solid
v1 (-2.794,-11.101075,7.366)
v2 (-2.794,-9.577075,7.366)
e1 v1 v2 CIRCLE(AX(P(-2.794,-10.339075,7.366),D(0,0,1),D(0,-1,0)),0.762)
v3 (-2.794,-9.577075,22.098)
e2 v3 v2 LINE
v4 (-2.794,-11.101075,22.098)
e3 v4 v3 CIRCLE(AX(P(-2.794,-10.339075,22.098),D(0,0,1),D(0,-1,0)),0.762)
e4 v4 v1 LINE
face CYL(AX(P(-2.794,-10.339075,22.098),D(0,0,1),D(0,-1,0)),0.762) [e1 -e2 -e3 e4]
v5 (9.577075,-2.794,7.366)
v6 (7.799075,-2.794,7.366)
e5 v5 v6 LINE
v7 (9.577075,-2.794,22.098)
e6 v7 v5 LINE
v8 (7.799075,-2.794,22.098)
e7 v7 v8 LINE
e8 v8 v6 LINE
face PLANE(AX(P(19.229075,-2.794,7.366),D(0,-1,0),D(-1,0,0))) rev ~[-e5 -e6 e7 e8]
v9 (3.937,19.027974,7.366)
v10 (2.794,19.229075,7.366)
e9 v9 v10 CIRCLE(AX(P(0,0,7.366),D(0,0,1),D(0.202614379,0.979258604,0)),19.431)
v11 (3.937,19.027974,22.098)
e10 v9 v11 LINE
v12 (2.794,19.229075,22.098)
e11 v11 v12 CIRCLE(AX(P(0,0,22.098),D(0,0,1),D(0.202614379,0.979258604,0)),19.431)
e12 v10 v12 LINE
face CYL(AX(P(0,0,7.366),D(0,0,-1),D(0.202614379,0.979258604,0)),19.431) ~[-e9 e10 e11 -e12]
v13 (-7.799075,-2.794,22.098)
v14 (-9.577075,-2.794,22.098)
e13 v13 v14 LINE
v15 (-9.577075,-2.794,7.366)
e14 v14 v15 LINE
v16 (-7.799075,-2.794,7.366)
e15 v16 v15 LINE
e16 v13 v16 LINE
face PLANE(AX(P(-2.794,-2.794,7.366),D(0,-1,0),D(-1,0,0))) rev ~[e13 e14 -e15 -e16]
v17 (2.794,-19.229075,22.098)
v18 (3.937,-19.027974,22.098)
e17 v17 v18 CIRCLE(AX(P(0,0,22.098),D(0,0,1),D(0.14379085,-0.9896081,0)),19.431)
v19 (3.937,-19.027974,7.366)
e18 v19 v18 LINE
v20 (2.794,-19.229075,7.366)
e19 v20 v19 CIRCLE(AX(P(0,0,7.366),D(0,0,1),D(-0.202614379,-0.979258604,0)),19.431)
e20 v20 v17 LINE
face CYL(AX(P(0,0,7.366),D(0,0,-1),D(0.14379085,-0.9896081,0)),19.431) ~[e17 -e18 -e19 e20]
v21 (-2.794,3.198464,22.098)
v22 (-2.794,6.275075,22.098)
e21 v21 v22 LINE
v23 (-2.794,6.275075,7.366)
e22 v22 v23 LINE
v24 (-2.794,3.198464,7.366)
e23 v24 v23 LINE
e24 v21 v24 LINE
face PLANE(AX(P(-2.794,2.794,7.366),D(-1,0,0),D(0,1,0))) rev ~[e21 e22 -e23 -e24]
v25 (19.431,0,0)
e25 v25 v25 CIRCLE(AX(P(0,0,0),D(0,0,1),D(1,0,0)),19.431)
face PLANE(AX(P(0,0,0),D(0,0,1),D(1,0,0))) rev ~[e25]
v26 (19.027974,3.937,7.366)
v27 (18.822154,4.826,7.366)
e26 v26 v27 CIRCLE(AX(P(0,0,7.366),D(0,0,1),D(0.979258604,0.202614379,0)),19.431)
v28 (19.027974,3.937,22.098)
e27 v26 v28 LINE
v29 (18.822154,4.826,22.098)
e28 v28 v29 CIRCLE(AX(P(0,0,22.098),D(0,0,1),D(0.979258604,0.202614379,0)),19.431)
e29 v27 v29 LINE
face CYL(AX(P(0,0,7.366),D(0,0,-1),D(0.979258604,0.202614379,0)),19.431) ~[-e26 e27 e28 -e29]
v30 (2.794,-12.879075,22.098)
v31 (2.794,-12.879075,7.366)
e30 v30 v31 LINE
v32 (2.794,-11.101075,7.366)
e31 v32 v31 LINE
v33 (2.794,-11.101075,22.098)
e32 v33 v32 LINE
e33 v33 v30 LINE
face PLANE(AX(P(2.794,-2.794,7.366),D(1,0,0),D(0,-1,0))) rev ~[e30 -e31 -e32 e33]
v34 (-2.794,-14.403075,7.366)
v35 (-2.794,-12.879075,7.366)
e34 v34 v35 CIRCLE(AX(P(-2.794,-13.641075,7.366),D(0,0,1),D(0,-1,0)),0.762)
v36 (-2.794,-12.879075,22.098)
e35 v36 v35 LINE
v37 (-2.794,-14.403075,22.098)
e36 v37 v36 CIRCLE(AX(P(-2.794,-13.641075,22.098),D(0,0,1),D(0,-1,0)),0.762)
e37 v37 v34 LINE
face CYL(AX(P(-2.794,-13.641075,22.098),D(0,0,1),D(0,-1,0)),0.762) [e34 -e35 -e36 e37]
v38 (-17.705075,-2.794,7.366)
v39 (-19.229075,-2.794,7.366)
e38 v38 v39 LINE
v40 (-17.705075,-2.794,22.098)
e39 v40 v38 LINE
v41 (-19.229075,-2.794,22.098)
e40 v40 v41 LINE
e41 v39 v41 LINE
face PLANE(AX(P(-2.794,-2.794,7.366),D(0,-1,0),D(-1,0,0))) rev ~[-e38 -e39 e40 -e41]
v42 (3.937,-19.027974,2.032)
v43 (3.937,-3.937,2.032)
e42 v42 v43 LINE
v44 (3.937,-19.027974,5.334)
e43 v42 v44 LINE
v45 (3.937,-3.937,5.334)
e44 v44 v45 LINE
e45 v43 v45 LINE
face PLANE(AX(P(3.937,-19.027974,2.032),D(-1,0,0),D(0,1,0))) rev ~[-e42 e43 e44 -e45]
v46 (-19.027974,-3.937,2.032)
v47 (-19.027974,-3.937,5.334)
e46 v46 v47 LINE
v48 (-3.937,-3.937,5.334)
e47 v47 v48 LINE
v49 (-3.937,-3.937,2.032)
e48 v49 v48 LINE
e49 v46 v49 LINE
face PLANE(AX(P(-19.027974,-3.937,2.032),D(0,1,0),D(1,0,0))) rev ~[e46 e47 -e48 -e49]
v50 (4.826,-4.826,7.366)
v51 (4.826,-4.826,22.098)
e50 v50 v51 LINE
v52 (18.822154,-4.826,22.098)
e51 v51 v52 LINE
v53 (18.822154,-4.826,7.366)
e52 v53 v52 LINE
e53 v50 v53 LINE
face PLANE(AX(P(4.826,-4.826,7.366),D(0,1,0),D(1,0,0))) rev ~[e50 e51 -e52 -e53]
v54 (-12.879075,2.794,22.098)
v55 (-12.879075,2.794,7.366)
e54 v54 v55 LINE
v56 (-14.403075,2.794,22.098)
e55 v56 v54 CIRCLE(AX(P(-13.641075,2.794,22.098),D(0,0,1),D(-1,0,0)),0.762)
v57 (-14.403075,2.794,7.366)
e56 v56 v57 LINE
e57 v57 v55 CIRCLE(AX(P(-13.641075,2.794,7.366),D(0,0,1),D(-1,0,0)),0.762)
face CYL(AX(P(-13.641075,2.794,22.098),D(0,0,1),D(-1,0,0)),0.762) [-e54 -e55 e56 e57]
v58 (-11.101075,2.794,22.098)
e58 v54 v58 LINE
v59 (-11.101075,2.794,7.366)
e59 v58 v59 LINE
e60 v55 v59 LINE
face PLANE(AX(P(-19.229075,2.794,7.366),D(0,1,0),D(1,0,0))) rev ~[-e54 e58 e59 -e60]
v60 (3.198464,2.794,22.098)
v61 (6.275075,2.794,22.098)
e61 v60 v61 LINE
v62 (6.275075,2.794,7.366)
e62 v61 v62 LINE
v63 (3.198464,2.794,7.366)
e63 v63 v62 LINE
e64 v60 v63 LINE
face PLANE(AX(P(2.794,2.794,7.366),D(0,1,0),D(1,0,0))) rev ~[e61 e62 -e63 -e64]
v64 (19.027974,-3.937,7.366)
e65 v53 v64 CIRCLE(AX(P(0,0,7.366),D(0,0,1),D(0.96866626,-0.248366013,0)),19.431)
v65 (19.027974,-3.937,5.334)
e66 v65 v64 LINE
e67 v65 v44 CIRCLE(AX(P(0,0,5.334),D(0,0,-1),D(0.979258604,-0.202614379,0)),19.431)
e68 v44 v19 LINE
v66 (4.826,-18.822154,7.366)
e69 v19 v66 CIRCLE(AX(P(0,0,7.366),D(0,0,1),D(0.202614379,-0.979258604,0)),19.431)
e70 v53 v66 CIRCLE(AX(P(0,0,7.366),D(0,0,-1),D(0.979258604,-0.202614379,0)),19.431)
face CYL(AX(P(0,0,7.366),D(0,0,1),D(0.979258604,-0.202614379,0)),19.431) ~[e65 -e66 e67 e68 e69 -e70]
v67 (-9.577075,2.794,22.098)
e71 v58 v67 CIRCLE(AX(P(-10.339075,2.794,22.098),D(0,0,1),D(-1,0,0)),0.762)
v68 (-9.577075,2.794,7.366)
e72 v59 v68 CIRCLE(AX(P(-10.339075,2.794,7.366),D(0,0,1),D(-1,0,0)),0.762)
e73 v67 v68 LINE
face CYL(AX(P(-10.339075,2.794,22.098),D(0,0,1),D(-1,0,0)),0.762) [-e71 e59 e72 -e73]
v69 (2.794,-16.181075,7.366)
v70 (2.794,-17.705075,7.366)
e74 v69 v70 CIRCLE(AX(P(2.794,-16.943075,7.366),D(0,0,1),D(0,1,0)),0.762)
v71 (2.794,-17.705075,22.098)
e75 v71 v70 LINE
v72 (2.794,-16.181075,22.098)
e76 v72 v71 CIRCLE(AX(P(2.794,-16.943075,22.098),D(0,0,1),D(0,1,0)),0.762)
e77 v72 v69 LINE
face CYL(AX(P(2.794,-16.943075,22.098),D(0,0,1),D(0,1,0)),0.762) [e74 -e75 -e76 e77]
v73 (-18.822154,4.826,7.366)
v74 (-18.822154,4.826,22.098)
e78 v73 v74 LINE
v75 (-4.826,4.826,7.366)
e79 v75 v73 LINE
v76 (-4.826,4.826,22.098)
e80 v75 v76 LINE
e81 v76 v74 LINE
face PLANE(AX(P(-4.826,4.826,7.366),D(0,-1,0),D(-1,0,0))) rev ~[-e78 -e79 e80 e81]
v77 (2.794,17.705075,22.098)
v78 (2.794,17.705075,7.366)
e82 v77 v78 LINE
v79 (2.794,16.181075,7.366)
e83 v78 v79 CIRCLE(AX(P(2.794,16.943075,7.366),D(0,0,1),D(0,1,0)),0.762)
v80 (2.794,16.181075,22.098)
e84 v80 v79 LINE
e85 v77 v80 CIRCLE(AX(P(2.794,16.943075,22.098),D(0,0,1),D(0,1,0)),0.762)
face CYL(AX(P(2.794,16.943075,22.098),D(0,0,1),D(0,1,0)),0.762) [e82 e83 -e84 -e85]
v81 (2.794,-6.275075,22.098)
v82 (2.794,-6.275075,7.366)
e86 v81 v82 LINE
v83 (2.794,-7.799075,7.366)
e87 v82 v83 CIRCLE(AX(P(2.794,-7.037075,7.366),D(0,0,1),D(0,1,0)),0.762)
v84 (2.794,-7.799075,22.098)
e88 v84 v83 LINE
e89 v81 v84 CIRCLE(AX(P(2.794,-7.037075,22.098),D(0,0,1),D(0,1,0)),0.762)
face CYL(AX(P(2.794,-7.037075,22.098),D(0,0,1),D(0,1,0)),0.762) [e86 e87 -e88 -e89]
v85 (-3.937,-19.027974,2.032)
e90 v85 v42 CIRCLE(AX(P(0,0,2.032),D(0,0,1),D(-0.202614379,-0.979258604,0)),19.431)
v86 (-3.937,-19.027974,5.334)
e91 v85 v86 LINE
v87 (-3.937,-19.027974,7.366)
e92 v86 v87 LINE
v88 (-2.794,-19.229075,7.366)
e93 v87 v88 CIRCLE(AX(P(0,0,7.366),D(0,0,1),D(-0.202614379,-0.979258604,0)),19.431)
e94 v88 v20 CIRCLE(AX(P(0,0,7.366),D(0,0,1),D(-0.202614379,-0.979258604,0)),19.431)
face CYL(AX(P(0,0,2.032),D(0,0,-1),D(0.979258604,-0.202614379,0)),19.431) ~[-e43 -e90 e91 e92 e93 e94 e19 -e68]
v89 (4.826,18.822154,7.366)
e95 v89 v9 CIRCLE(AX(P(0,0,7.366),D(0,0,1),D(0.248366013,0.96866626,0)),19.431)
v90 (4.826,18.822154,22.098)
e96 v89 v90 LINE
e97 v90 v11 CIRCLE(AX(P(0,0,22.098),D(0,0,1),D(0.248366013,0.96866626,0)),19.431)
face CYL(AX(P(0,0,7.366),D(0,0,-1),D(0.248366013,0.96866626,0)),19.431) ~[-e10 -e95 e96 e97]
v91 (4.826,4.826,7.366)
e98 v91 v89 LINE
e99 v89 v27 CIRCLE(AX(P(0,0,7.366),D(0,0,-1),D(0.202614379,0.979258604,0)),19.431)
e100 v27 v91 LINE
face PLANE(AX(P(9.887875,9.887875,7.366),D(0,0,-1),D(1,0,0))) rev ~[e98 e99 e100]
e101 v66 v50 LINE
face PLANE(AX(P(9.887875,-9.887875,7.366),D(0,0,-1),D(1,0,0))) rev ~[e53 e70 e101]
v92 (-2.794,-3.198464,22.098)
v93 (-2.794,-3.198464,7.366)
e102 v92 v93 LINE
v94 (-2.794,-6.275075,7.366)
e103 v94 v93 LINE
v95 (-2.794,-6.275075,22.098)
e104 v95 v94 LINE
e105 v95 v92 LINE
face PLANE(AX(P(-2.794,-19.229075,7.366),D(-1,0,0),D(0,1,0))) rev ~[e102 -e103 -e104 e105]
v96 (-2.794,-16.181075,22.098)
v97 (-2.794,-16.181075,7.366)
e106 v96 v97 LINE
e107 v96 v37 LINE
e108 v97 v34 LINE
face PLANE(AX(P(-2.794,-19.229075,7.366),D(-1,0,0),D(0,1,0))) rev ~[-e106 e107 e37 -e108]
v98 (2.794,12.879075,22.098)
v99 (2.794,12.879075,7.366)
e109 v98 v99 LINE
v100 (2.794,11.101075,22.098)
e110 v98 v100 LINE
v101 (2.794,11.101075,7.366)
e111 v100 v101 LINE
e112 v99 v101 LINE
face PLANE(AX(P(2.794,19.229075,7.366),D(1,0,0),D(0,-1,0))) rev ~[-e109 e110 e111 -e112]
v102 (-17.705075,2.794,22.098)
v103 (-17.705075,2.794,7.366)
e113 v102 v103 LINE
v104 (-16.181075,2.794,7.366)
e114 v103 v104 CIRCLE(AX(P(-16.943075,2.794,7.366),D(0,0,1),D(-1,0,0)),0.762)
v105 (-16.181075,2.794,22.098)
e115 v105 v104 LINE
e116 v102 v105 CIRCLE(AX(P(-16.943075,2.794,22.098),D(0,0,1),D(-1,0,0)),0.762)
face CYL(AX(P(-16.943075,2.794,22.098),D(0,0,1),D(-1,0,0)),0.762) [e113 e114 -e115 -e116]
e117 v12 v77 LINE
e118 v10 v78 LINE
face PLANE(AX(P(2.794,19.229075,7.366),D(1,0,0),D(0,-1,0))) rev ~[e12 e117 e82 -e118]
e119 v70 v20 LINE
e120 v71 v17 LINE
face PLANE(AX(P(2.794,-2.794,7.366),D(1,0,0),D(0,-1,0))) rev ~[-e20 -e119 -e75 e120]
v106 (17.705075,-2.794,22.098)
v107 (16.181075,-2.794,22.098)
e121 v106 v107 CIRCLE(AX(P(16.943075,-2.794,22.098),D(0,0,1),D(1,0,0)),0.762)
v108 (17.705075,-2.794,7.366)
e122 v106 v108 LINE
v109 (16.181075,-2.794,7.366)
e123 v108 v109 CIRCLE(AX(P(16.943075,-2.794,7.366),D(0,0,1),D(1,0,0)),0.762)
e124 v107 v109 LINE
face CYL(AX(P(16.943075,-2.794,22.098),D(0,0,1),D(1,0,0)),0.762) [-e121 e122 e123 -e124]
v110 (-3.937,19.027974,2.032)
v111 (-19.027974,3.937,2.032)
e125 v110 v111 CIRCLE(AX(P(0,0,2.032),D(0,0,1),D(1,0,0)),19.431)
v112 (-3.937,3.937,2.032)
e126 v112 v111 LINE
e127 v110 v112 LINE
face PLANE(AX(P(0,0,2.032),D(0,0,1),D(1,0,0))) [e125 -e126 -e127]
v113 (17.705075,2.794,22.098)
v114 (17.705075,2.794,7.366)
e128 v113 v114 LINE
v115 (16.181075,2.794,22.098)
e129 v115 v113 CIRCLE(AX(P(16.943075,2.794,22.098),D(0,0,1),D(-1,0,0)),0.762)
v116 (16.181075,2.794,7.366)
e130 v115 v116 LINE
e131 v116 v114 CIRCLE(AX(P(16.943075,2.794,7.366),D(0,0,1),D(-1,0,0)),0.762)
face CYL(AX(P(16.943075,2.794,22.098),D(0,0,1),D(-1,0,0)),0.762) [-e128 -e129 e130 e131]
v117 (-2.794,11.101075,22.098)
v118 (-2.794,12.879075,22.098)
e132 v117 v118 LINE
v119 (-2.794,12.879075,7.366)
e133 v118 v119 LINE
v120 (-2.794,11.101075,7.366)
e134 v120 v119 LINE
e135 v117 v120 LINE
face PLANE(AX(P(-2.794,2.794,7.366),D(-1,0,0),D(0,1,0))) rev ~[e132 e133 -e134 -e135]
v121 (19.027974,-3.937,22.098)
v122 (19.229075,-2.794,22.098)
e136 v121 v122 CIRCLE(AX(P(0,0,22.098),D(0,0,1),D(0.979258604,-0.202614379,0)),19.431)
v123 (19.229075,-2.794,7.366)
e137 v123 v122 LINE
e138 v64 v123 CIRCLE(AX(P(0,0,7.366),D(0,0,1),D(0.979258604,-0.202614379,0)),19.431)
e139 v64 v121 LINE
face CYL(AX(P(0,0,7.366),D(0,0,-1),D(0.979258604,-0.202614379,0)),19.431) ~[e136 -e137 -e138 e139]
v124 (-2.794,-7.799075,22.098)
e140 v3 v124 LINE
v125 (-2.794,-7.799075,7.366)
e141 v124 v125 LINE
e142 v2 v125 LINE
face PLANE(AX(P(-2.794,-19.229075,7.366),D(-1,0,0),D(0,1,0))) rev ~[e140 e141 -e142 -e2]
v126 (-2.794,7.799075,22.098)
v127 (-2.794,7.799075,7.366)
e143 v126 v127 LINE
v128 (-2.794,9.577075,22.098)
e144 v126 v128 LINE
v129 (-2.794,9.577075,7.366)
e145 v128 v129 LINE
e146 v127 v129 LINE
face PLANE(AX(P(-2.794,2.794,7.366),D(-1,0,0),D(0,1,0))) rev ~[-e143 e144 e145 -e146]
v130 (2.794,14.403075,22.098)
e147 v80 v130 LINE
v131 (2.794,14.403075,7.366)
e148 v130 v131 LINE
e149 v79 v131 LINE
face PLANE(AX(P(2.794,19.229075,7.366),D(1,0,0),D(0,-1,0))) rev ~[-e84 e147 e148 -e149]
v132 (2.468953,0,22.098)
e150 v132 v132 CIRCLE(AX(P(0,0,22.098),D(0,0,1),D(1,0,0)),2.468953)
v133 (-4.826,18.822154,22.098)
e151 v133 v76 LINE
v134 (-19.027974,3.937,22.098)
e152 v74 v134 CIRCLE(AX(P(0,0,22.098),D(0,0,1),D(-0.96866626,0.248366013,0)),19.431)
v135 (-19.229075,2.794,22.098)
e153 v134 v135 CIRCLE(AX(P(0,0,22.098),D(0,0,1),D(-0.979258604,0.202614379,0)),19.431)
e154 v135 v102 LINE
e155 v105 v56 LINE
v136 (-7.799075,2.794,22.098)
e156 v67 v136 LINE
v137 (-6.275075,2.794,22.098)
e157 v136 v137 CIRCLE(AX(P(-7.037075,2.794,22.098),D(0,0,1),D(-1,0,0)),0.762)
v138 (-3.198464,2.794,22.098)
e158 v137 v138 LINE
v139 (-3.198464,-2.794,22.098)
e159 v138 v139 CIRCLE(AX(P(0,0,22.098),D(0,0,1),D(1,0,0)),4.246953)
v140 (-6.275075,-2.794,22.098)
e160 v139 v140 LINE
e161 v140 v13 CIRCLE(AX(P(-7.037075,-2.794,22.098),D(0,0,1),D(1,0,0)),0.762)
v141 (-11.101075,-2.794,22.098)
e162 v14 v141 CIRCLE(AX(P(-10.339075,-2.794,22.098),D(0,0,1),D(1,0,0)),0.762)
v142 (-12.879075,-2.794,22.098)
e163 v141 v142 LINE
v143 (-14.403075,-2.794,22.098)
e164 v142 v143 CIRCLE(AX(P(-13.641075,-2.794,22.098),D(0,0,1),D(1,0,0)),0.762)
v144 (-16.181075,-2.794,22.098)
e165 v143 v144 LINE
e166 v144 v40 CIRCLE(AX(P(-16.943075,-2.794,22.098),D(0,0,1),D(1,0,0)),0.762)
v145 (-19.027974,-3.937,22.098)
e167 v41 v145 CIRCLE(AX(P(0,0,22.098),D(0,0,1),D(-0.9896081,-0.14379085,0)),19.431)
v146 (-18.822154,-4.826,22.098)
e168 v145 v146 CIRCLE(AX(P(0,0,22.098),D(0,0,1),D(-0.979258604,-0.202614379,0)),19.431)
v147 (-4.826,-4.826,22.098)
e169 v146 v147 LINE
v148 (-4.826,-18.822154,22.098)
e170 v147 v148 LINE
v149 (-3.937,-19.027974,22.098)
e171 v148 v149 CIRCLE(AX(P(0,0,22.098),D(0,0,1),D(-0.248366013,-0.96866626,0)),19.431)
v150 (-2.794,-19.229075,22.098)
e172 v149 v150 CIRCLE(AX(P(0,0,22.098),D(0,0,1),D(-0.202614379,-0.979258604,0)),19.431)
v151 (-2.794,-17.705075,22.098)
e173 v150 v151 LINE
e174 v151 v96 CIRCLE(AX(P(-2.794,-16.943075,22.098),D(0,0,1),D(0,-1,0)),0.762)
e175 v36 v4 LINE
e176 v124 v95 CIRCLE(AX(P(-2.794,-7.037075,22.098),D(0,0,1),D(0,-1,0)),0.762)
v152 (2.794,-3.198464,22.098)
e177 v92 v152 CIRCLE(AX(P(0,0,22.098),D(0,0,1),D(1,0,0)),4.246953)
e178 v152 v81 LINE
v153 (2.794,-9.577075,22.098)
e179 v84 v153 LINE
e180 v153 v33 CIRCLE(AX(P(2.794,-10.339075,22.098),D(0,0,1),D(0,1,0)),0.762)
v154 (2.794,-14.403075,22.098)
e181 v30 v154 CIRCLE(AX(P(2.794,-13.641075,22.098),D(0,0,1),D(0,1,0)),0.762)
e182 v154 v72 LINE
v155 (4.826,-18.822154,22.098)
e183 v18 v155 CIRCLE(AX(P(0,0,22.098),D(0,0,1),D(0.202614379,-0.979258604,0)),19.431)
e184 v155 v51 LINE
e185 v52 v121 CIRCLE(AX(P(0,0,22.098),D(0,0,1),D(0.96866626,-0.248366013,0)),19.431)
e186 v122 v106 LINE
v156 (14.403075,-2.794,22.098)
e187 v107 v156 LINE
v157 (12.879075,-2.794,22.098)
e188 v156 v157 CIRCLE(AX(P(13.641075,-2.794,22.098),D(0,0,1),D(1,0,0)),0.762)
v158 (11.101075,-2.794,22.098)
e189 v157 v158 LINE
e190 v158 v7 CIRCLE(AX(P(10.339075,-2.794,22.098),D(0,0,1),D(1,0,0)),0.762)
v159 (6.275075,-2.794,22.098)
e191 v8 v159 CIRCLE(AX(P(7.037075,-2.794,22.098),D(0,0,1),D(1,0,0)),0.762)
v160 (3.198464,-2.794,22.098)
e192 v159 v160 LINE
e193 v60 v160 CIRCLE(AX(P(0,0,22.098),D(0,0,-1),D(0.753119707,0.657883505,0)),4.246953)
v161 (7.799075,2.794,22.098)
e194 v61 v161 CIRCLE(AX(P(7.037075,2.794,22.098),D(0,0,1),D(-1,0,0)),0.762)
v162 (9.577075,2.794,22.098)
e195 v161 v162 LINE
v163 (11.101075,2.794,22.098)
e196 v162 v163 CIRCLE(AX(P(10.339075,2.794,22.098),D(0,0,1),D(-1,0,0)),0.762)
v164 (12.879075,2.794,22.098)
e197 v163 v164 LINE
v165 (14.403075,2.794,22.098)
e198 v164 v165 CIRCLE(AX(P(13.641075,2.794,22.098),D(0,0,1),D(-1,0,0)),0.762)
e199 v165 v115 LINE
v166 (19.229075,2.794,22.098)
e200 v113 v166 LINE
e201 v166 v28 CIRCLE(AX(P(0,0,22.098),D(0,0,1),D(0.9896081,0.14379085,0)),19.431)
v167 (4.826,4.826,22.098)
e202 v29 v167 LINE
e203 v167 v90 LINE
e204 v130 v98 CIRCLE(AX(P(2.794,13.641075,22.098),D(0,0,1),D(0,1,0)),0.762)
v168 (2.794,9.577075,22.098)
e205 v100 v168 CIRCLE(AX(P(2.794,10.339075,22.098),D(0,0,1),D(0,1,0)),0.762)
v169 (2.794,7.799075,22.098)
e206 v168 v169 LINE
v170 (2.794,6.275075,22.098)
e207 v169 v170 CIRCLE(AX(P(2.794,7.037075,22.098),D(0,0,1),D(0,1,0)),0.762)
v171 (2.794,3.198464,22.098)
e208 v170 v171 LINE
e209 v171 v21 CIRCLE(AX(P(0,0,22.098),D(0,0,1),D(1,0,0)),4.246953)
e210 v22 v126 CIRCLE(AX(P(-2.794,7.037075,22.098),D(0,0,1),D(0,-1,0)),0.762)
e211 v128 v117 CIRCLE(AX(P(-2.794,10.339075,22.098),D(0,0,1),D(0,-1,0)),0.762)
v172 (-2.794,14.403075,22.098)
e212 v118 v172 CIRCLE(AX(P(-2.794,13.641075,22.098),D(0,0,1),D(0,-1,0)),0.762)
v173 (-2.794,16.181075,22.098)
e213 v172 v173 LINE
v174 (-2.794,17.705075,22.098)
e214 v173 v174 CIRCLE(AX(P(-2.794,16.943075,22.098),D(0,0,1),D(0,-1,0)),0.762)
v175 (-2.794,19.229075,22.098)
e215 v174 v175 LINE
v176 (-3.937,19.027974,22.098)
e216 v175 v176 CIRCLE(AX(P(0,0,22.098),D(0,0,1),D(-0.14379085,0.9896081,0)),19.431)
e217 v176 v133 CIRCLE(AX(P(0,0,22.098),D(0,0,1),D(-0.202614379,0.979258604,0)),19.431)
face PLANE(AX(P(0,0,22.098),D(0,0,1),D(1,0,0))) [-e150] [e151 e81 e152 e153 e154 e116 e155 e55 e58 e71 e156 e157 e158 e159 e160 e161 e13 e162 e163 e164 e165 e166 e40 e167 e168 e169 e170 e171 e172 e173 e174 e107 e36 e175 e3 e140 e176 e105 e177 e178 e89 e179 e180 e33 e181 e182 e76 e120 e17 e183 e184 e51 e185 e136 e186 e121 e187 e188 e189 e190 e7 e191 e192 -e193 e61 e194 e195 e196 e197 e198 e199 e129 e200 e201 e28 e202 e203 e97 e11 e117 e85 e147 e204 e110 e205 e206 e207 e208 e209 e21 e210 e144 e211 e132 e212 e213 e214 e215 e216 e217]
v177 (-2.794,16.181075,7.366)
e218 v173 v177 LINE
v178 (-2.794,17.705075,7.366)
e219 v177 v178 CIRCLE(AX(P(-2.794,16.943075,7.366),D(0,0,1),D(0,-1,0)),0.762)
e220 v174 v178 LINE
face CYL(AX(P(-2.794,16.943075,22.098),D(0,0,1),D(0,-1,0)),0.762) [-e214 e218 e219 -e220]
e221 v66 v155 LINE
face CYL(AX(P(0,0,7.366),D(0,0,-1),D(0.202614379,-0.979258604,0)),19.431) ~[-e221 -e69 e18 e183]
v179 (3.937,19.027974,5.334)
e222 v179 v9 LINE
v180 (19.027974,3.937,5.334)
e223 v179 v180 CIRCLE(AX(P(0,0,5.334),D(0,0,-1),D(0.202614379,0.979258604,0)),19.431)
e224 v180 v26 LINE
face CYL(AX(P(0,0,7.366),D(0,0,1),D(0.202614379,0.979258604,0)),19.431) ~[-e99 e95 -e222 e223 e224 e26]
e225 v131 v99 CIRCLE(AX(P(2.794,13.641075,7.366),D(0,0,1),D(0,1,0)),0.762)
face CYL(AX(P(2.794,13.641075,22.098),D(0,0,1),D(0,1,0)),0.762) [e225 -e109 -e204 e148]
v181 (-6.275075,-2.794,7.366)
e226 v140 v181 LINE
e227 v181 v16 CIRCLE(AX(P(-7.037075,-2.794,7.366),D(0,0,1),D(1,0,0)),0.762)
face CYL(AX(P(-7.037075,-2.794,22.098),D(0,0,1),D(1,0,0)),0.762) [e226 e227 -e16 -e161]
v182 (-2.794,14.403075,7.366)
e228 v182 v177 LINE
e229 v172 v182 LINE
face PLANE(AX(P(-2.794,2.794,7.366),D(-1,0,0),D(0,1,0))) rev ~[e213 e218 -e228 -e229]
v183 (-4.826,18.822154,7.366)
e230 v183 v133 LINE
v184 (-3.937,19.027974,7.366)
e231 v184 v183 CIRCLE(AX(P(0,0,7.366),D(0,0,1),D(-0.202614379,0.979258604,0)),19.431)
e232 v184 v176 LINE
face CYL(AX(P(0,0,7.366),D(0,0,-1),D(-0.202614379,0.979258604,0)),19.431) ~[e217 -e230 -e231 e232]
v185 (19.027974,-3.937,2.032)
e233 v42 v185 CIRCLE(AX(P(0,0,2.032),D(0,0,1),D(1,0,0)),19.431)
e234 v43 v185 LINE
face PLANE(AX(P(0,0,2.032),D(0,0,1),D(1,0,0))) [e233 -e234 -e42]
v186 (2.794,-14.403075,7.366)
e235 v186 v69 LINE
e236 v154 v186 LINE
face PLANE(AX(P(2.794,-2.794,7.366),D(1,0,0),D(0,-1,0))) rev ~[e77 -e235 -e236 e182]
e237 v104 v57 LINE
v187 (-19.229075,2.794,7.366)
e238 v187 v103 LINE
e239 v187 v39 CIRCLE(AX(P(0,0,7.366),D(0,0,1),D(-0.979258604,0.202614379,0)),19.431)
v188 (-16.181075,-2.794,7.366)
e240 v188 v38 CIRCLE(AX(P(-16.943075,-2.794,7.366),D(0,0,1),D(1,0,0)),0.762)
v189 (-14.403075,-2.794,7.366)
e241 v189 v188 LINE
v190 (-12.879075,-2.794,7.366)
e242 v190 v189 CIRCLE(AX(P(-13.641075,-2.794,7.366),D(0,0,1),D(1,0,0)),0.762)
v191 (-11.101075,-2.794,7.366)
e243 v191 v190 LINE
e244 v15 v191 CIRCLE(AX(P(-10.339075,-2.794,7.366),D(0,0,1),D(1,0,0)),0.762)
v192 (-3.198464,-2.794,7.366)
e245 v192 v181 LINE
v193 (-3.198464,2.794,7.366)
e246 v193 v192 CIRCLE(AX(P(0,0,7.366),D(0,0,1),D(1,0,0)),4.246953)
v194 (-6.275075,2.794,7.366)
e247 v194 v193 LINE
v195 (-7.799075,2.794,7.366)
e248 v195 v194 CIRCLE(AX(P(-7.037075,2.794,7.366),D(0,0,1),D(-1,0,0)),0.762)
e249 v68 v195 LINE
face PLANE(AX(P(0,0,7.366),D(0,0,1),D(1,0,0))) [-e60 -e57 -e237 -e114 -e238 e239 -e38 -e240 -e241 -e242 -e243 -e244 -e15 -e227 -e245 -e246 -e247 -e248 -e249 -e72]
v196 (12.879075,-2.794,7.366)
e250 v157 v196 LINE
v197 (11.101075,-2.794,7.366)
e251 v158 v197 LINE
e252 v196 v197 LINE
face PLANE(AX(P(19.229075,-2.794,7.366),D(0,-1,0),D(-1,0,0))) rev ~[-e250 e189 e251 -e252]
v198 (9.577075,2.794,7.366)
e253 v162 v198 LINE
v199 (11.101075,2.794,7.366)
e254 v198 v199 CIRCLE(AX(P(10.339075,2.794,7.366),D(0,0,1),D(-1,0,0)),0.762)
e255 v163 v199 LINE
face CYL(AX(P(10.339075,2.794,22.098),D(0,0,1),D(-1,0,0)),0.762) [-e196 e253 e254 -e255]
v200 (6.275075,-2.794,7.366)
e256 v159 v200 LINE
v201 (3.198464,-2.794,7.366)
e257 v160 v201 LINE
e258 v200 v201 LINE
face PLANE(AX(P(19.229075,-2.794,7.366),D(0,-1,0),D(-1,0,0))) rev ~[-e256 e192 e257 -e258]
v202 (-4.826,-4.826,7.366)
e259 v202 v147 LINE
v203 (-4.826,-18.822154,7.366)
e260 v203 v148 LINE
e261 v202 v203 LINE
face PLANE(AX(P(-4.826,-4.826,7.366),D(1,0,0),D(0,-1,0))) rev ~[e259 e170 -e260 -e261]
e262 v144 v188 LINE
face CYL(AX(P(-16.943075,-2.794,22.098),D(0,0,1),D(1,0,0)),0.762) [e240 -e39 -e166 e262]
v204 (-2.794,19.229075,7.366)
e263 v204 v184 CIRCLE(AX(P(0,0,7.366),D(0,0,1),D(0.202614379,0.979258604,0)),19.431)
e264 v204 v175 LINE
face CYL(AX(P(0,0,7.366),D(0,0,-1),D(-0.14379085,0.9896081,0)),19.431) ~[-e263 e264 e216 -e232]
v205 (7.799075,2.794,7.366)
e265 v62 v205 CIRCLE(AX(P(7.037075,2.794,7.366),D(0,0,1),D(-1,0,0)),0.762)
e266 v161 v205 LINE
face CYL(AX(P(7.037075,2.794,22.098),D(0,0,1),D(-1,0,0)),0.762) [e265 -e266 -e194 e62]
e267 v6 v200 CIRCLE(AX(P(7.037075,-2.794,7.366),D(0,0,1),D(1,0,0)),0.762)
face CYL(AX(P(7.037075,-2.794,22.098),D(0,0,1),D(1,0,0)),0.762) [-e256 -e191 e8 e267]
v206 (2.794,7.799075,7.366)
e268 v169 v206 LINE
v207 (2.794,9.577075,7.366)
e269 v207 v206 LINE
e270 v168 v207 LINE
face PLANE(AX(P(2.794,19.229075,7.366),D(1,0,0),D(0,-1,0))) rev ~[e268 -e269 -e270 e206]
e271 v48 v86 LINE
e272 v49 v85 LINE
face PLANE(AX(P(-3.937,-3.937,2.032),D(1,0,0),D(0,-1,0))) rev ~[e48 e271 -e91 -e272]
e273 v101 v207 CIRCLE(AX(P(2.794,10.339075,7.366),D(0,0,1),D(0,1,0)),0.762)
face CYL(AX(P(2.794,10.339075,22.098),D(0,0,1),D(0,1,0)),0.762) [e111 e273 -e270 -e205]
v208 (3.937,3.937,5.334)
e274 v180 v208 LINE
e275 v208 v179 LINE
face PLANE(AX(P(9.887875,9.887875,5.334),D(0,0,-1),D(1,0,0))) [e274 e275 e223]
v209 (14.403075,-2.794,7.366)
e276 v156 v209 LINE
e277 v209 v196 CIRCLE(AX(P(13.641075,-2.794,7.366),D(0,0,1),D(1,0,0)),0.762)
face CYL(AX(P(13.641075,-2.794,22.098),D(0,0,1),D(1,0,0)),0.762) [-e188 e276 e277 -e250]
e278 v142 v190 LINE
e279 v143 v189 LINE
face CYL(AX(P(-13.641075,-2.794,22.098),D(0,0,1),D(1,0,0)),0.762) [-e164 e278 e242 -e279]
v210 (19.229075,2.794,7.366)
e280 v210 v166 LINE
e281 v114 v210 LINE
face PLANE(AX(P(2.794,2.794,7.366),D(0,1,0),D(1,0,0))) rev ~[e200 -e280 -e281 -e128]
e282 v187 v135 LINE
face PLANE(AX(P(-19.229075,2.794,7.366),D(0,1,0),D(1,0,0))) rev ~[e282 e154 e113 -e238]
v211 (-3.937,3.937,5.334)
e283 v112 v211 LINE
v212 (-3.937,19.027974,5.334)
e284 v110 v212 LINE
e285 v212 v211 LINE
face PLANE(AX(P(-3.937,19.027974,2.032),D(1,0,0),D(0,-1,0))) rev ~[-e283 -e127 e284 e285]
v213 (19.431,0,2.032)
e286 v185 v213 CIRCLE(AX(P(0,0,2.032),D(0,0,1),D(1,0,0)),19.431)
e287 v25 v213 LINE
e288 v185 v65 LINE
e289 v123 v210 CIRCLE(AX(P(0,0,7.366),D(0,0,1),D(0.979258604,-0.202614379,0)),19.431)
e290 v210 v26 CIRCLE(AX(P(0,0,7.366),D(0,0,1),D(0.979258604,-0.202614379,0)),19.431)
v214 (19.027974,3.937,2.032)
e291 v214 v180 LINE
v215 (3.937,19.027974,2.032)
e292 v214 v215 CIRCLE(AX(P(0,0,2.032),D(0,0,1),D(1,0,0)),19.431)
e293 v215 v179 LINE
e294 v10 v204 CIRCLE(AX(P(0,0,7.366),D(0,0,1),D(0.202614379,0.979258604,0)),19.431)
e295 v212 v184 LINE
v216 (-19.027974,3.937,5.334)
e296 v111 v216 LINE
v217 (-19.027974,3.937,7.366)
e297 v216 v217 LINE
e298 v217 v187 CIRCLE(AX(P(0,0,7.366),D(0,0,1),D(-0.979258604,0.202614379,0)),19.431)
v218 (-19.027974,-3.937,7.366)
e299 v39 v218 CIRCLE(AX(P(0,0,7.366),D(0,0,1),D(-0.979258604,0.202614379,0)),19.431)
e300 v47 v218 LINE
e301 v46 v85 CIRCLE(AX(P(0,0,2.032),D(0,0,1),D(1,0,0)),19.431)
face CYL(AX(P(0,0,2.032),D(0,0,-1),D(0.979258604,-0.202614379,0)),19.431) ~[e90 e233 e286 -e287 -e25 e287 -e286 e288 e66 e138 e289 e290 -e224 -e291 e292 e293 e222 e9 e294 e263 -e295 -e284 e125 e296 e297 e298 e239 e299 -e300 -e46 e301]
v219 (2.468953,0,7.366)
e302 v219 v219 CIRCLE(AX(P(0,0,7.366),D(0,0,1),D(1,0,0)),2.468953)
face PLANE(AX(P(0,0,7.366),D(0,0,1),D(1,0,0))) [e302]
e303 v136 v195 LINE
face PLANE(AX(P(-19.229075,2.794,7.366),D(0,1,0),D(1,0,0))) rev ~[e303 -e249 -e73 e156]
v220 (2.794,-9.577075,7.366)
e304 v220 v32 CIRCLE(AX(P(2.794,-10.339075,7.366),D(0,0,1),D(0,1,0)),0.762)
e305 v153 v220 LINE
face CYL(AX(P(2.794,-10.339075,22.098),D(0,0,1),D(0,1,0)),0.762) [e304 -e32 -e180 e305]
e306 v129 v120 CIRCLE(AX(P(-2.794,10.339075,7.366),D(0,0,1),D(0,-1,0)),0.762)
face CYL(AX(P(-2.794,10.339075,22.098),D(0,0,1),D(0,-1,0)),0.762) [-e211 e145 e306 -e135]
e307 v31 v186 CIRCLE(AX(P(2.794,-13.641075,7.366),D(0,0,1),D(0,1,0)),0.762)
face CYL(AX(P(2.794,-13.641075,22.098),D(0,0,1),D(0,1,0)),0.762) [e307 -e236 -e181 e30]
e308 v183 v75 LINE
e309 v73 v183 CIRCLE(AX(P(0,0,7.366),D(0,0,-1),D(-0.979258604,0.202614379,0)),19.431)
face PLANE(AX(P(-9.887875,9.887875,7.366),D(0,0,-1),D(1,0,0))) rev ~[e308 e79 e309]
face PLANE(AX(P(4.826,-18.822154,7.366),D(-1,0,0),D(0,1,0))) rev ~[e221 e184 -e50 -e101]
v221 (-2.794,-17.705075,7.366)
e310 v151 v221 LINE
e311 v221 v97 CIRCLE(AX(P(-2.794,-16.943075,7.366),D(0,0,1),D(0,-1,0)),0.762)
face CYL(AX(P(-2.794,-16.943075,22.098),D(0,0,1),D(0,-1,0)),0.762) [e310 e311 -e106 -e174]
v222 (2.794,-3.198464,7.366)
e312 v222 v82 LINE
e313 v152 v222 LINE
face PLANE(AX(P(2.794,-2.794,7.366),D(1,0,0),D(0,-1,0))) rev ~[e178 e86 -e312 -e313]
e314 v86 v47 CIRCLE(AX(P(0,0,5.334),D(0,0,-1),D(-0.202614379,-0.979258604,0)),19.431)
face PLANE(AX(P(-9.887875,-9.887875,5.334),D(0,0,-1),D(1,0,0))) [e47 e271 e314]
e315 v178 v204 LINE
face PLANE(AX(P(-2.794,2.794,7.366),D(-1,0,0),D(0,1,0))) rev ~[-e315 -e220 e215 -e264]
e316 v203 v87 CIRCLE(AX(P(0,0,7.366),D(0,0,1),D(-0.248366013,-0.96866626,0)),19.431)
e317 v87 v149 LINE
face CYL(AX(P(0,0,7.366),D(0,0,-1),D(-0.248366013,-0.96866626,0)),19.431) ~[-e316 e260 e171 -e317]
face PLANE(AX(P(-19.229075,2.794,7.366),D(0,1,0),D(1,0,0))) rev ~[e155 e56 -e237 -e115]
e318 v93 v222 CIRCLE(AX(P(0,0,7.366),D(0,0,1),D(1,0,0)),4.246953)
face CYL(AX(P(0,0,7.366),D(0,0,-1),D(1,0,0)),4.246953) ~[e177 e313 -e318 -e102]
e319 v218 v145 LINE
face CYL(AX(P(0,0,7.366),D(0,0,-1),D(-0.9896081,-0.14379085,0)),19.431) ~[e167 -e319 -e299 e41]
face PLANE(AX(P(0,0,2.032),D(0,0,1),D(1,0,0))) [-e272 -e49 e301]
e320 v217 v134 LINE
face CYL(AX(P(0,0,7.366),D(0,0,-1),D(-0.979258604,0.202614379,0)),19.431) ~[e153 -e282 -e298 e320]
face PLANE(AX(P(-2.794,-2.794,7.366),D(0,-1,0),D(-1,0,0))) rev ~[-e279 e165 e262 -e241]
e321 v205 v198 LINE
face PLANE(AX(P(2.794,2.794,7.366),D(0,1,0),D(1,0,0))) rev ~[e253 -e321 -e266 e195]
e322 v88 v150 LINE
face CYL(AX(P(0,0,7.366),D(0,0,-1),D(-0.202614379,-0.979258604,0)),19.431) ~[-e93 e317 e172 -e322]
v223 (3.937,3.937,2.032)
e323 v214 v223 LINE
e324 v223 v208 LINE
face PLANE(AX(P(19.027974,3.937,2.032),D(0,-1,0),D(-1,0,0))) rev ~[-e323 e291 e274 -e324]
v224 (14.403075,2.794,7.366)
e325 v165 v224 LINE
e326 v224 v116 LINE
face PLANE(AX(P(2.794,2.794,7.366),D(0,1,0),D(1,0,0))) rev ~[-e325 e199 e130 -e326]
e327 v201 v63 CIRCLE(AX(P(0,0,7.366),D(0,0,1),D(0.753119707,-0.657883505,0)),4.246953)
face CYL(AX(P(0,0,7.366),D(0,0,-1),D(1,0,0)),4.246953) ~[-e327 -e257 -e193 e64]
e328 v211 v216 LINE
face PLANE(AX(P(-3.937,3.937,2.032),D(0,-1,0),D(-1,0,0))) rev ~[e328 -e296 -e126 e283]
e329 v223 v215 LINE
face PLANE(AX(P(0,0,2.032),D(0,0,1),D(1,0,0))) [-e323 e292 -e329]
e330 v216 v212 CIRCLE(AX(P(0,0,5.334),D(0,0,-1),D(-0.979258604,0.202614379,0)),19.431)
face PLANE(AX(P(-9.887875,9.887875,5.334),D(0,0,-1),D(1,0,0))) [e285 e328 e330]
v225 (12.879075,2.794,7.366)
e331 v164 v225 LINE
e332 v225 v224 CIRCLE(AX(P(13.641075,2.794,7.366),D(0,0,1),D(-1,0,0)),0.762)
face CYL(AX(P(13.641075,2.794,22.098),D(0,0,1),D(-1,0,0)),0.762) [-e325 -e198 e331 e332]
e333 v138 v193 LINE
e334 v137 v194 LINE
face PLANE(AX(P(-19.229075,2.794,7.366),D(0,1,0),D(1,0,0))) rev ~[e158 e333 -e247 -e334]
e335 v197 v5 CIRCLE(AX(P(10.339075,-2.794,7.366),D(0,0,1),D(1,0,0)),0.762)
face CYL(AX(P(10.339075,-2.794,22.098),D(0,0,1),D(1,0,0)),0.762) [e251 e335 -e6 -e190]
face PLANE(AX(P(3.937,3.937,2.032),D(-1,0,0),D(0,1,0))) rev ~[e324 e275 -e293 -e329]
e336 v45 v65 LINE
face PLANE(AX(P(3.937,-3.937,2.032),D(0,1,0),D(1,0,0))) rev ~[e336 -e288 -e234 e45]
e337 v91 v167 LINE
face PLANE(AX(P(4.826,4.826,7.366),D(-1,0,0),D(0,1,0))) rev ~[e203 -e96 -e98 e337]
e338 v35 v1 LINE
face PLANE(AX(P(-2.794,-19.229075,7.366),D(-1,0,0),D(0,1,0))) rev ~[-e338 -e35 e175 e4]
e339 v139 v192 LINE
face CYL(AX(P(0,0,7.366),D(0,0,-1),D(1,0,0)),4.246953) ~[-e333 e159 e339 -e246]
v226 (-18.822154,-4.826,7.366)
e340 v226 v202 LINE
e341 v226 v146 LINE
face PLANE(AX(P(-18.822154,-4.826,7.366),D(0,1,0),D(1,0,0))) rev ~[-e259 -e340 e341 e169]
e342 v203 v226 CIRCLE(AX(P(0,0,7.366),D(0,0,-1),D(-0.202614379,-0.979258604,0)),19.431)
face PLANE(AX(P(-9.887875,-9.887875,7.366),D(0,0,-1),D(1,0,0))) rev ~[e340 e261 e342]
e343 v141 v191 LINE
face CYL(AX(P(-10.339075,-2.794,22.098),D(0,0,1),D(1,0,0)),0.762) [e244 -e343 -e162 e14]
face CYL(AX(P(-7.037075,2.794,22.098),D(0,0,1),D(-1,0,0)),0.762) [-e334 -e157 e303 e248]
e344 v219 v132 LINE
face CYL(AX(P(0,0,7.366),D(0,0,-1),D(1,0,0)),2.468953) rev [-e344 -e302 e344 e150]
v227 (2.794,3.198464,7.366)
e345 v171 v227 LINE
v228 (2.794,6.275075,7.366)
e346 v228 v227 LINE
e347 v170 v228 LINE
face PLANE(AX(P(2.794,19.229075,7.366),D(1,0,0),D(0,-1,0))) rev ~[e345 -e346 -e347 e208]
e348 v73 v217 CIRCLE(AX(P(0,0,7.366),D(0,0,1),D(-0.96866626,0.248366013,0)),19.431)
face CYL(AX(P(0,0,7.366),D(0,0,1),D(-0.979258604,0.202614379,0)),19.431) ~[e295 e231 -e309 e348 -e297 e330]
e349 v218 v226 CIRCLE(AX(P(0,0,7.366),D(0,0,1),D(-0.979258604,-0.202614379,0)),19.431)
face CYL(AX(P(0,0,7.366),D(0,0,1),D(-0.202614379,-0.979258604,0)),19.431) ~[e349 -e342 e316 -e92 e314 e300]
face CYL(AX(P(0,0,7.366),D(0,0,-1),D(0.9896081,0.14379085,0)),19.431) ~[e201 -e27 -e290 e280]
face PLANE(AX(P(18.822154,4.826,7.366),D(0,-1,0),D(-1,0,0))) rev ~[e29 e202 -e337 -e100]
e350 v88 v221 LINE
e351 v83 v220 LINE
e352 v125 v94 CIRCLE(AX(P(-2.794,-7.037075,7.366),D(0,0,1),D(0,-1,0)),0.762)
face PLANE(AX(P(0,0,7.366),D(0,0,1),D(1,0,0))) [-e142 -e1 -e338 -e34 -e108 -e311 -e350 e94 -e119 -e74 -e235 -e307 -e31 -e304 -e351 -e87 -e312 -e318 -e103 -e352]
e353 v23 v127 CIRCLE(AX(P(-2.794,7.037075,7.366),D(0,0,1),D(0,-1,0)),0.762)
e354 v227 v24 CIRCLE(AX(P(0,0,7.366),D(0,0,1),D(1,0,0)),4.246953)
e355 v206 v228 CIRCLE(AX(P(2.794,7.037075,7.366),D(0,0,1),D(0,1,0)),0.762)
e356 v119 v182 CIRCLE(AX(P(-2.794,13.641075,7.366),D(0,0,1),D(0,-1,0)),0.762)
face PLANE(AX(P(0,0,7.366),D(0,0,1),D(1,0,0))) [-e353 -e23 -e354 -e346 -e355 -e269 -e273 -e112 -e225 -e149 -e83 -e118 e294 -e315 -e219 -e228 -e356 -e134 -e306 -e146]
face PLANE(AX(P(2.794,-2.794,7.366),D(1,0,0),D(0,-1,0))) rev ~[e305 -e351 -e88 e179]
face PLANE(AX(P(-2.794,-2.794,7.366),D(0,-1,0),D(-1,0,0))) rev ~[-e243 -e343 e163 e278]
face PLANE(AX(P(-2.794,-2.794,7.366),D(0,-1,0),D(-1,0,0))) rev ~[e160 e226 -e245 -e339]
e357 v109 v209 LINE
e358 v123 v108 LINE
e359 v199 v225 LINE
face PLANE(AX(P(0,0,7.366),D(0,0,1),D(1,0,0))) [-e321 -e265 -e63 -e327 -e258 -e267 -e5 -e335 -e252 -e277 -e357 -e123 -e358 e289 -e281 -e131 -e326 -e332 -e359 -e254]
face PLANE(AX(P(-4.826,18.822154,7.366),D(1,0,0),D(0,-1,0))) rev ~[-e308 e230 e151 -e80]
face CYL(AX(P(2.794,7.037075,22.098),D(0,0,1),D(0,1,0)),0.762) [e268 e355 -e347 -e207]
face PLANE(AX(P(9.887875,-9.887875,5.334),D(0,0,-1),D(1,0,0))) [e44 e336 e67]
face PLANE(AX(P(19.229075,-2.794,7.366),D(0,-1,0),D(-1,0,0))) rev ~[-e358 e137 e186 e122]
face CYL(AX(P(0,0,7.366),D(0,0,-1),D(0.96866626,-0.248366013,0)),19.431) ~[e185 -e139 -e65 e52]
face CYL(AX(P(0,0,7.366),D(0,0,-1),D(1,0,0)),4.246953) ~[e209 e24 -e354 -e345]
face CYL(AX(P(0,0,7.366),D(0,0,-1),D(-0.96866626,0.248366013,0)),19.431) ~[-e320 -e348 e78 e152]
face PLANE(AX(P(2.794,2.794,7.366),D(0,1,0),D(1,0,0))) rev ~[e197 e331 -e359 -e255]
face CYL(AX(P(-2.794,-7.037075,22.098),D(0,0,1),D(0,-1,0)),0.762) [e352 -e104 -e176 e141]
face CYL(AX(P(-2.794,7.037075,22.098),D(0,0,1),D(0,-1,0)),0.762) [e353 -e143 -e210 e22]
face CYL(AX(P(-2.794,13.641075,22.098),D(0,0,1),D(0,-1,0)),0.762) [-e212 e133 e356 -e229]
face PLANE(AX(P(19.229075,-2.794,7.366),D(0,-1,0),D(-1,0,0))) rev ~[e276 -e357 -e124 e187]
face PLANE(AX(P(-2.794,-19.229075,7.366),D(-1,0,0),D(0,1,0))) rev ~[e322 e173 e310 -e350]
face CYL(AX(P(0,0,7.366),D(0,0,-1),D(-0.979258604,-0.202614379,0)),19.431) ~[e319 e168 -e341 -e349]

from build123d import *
from build123d import SkipClean  # not in build123d's __all__

# Parameters (mm, degrees)
F0_R      = 19.431
F1_DEPTH  = 2.032
F3_DEPTH  = 5.334
F5_DEPTH  = 14.732
F6_R      = 4.2469525028
F6_R_2    = 2.4689525028
F7_DEPTH  = 14.732
F9_DEPTH  = 2.032
F11_DEPTH = 14.732


# Not quite as in the source:
# - after a boolean that leaves OpenCascade's solid faulty, fix() repairs it


with BuildPart() as f1:
    # F0 (on Top) → F1 (new body)
    with BuildSketch(Plane.XY):
        Circle(F0_R)
    extrude(amount=F1_DEPTH)

    # F2 (on face) → F3 (join)
    with BuildSketch(Plane.XY.offset(2.032)):
        with BuildLine():
            Line((3.937, 3.937), (3.937, 19.0279739331))
            ThreePointArc((3.937, 19.0279739331), (0, 19.431), (-3.937, 19.0279739331))
            Line((-3.937, 19.0279739331), (-3.937, 3.937))
            Line((-3.937, 3.937), (-19.0279739331, 3.937))
            ThreePointArc((-19.0279739331, 3.937), (-19.431, 0), (-19.0279739331, -3.937))
            Line((-19.0279739331, -3.937), (-3.937, -3.937))
            Line((-3.937, -3.937), (-3.937, -19.0279739331))
            ThreePointArc((-3.937, -19.0279739331), (0, -19.431), (3.937, -19.0279739331))
            Line((3.937, -19.0279739331), (3.937, -3.937))
            Line((3.937, -3.937), (19.0279739331, -3.937))
            ThreePointArc((19.0279739331, -3.937), (19.431, 0), (19.0279739331, 3.937))
            Line((19.0279739331, 3.937), (3.937, 3.937))
        make_face()
    extrude(amount=F3_DEPTH)

    # F4 (on face) → F5 (join)
    with BuildSketch(Plane.XY.offset(7.366)):
        with BuildLine():
            ThreePointArc((3.937, 19.0279739331), (3.3670017313, 19.1370598667), (2.794, 19.2290749908))
            Line((2.794, 19.2290749908), (2.794, 2.794))
            Line((2.794, 2.794), (19.2290749908, 2.794))
            ThreePointArc((19.2290749908, 2.794), (19.1370598667, 3.3670017313), (19.0279739331, 3.937))
            ThreePointArc((19.0279739331, 3.937), (18.9302833655, 4.3827083751), (18.822154101, 4.826))
            Line((18.822154101, 4.826), (4.826, 4.826))
            Line((4.826, 4.826), (4.826, 18.822154101))
            ThreePointArc((4.826, 18.822154101), (4.3827083751, 18.9302833655), (3.937, 19.0279739331))
        make_face()
        with BuildLine():
            ThreePointArc((-3.937, 19.0279739331), (-4.3827083751, 18.9302833655), (-4.826, 18.822154101))
            Line((-4.826, 18.822154101), (-4.826, 4.826))
            Line((-4.826, 4.826), (-18.822154101, 4.826))
            ThreePointArc((-18.822154101, 4.826), (-18.9302833655, 4.3827083751), (-19.0279739331, 3.937))
            ThreePointArc((-19.0279739331, 3.937), (-19.1370598667, 3.3670017313), (-19.2290749908, 2.794))
            Line((-19.2290749908, 2.794), (-2.794, 2.794))
            Line((-2.794, 2.794), (-2.794, 19.2290749908))
            ThreePointArc((-2.794, 19.2290749908), (-3.3670017313, 19.1370598667), (-3.937, 19.0279739331))
        make_face()
        with BuildLine():
            ThreePointArc((-19.0279739331, -3.937), (-18.9302833655, -4.3827083751), (-18.822154101, -4.826))
            Line((-18.822154101, -4.826), (-4.826, -4.826))
            Line((-4.826, -4.826), (-4.826, -18.822154101))
            ThreePointArc((-4.826, -18.822154101), (-4.3827083751, -18.9302833655), (-3.937, -19.0279739331))
            ThreePointArc((-3.937, -19.0279739331), (-3.3670017313, -19.1370598667), (-2.794, -19.2290749908))
            Line((-2.794, -19.2290749908), (-2.794, -2.794))
            Line((-2.794, -2.794), (-19.2290749908, -2.794))
            ThreePointArc((-19.2290749908, -2.794), (-19.1370598667, -3.3670017313), (-19.0279739331, -3.937))
        make_face()
        with BuildLine():
            ThreePointArc((3.937, -19.0279739331), (4.3827083751, -18.9302833655), (4.826, -18.822154101))
            Line((4.826, -18.822154101), (4.826, -4.826))
            Line((4.826, -4.826), (18.822154101, -4.826))
            ThreePointArc((18.822154101, -4.826), (18.9302833655, -4.3827083751), (19.0279739331, -3.937))
            ThreePointArc((19.0279739331, -3.937), (19.1370598667, -3.3670017313), (19.2290749908, -2.794))
            Line((19.2290749908, -2.794), (2.794, -2.794))
            Line((2.794, -2.794), (2.794, -19.2290749908))
            ThreePointArc((2.794, -19.2290749908), (3.3670017313, -19.1370598667), (3.937, -19.0279739331))
        make_face()
    extrude(amount=F5_DEPTH)

    # F6 (on face) → F7 (join, through all)
    with BuildSketch(Plane.XY.offset(7.366)):
        Circle(F6_R)
        Circle(F6_R_2, mode=Mode.SUBTRACT)
    extrude(amount=F7_DEPTH)

    # F8 (on face) → F9 (join)
    with BuildSketch(Plane(origin=(0, 0, 7.366), x_dir=(1, 0, 0), z_dir=(0, 0, -1))):
        with BuildLine():
            Line((-3.937, 3.937), (-3.937, 19.0279739331))
            ThreePointArc((-3.937, 19.0279739331), (-13.7397918652, 13.7397918652), (-19.0279739331, 3.937))
            Line((-19.0279739331, 3.937), (-3.937, 3.937))
        make_face()
        with BuildLine():
            ThreePointArc((-19.0279739331, -3.937), (-13.7397918652, -13.7397918652), (-3.937, -19.0279739331))
            Line((-3.937, -19.0279739331), (-3.937, -3.937))
            Line((-3.937, -3.937), (-19.0279739331, -3.937))
        make_face()
        with BuildLine():
            ThreePointArc((3.937, -19.0279739331), (13.7397918652, -13.7397918652), (19.0279739331, -3.937))
            Line((19.0279739331, -3.937), (3.937, -3.937))
            Line((3.937, -3.937), (3.937, -19.0279739331))
        make_face()
        with BuildLine():
            ThreePointArc((19.0279739331, 3.937), (13.7397918652, 13.7397918652), (3.937, 19.0279739331))
            Line((3.937, 19.0279739331), (3.937, 3.937))
            Line((3.937, 3.937), (19.0279739331, 3.937))
        make_face()
    with SkipClean():  # cleaning this boolean's faces spoils the solid; the shape is the same uncleaned
        extrude(amount=F9_DEPTH)

    # F10 (on face) → F11 (join, through all)
    with BuildSketch(Plane.XY.offset(22.098)):
        with BuildLine():
            Line((16.1810749908, -2.794), (17.7050749908, -2.794))
            ThreePointArc((17.7050749908, -2.794), (16.9430749908, -2.032), (16.1810749908, -2.794))
        make_face()
        with BuildLine():
            Line((12.8790749908, -2.794), (14.4030749908, -2.794))
            ThreePointArc((14.4030749908, -2.794), (13.6410749908, -2.032), (12.8790749908, -2.794))
        make_face()
        with BuildLine():
            Line((9.5770749908, -2.794), (11.1010749908, -2.794))
            ThreePointArc((11.1010749908, -2.794), (10.3390749908, -2.032), (9.5770749908, -2.794))
        make_face()
        with BuildLine():
            Line((6.2750749908, -2.794), (7.7990749908, -2.794))
            ThreePointArc((7.7990749908, -2.794), (7.0370749908, -2.032), (6.2750749908, -2.794))
        make_face()
        with BuildLine():
            ThreePointArc((16.1810749908, 2.794), (16.9430749908, 2.032), (17.7050749908, 2.794))
            Line((17.7050749908, 2.794), (16.1810749908, 2.794))
        make_face()
        with BuildLine():
            ThreePointArc((6.2750749908, 2.794), (7.0370749908, 2.032), (7.7990749908, 2.794))
            Line((7.7990749908, 2.794), (6.2750749908, 2.794))
        make_face()
        with BuildLine():
            ThreePointArc((12.8790749908, 2.794), (13.6410749908, 2.032), (14.4030749908, 2.794))
            Line((14.4030749908, 2.794), (12.8790749908, 2.794))
        make_face()
        with BuildLine():
            ThreePointArc((9.5770749908, 2.794), (10.3390749908, 2.032), (11.1010749908, 2.794))
            Line((11.1010749908, 2.794), (9.5770749908, 2.794))
        make_face()
        with BuildLine():
            Line((2.794, 9.5770749908), (2.794, 11.1010749908))
            ThreePointArc((2.794, 11.1010749908), (2.032, 10.3390749908), (2.794, 9.5770749908))
        make_face()
        with BuildLine():
            ThreePointArc((-2.794, 9.5770749908), (-2.032, 10.3390749908), (-2.794, 11.1010749908))
            Line((-2.794, 11.1010749908), (-2.794, 9.5770749908))
        make_face()
        with BuildLine():
            Line((2.794, 6.2750749908), (2.794, 7.7990749908))
            ThreePointArc((2.794, 7.7990749908), (2.032, 7.0370749908), (2.794, 6.2750749908))
        make_face()
        with BuildLine():
            Line((2.794, 16.1810749908), (2.794, 17.7050749908))
            ThreePointArc((2.794, 17.7050749908), (2.032, 16.9430749908), (2.794, 16.1810749908))
        make_face()
        with BuildLine():
            ThreePointArc((-2.794, 16.1810749908), (-2.032, 16.9430749908), (-2.794, 17.7050749908))
            Line((-2.794, 17.7050749908), (-2.794, 16.1810749908))
        make_face()
        with BuildLine():
            ThreePointArc((-2.794, 6.2750749908), (-2.032, 7.0370749908), (-2.794, 7.7990749908))
            Line((-2.794, 7.7990749908), (-2.794, 6.2750749908))
        make_face()
        with BuildLine():
            Line((2.794, 12.8790749908), (2.794, 14.4030749908))
            ThreePointArc((2.794, 14.4030749908), (2.032, 13.6410749908), (2.794, 12.8790749908))
        make_face()
        with BuildLine():
            ThreePointArc((-2.794, 12.8790749908), (-2.032, 13.6410749908), (-2.794, 14.4030749908))
            Line((-2.794, 14.4030749908), (-2.794, 12.8790749908))
        make_face()
        with BuildLine():
            Line((-9.5770749908, 2.794), (-11.1010749908, 2.794))
            ThreePointArc((-11.1010749908, 2.794), (-10.3390749908, 2.032), (-9.5770749908, 2.794))
        make_face()
        with BuildLine():
            ThreePointArc((-9.5770749908, -2.794), (-10.3390749908, -2.032), (-11.1010749908, -2.794))
            Line((-11.1010749908, -2.794), (-9.5770749908, -2.794))
        make_face()
        with BuildLine():
            Line((-6.2750749908, 2.794), (-7.7990749908, 2.794))
            ThreePointArc((-7.7990749908, 2.794), (-7.0370749908, 2.032), (-6.2750749908, 2.794))
        make_face()
        with BuildLine():
            Line((-16.1810749908, 2.794), (-17.7050749908, 2.794))
            ThreePointArc((-17.7050749908, 2.794), (-16.9430749908, 2.032), (-16.1810749908, 2.794))
        make_face()
        with BuildLine():
            ThreePointArc((-16.1810749908, -2.794), (-16.9430749908, -2.032), (-17.7050749908, -2.794))
            Line((-17.7050749908, -2.794), (-16.1810749908, -2.794))
        make_face()
        with BuildLine():
            ThreePointArc((-6.2750749908, -2.794), (-7.0370749908, -2.032), (-7.7990749908, -2.794))
            Line((-7.7990749908, -2.794), (-6.2750749908, -2.794))
        make_face()
        with BuildLine():
            Line((-12.8790749908, 2.794), (-14.4030749908, 2.794))
            ThreePointArc((-14.4030749908, 2.794), (-13.6410749908, 2.032), (-12.8790749908, 2.794))
        make_face()
        with BuildLine():
            ThreePointArc((-12.8790749908, -2.794), (-13.6410749908, -2.032), (-14.4030749908, -2.794))
            Line((-14.4030749908, -2.794), (-12.8790749908, -2.794))
        make_face()
        with BuildLine():
            Line((-2.794, -9.5770749908), (-2.794, -11.1010749908))
            ThreePointArc((-2.794, -11.1010749908), (-2.032, -10.3390749908), (-2.794, -9.5770749908))
        make_face()
        with BuildLine():
            ThreePointArc((2.794, -9.5770749908), (2.032, -10.3390749908), (2.794, -11.1010749908))
            Line((2.794, -11.1010749908), (2.794, -9.5770749908))
        make_face()
        with BuildLine():
            Line((-2.794, -6.2750749908), (-2.794, -7.7990749908))
            ThreePointArc((-2.794, -7.7990749908), (-2.032, -7.0370749908), (-2.794, -6.2750749908))
        make_face()
        with BuildLine():
            Line((-2.794, -16.1810749908), (-2.794, -17.7050749908))
            ThreePointArc((-2.794, -17.7050749908), (-2.032, -16.9430749908), (-2.794, -16.1810749908))
        make_face()
        with BuildLine():
            ThreePointArc((2.794, -16.1810749908), (2.032, -16.9430749908), (2.794, -17.7050749908))
            Line((2.794, -17.7050749908), (2.794, -16.1810749908))
        make_face()
        with BuildLine():
            ThreePointArc((2.794, -6.2750749908), (2.032, -7.0370749908), (2.794, -7.7990749908))
            Line((2.794, -7.7990749908), (2.794, -6.2750749908))
        make_face()
        with BuildLine():
            Line((-2.794, -12.8790749908), (-2.794, -14.4030749908))
            ThreePointArc((-2.794, -14.4030749908), (-2.032, -13.6410749908), (-2.794, -12.8790749908))
        make_face()
        with BuildLine():
            ThreePointArc((2.794, -12.8790749908), (2.032, -13.6410749908), (2.794, -14.4030749908))
            Line((2.794, -14.4030749908), (2.794, -12.8790749908))
        make_face()
    extrude(amount=-F11_DEPTH)

    add(f1.part.fix(), mode=Mode.REPLACE)


solid = f1.part
